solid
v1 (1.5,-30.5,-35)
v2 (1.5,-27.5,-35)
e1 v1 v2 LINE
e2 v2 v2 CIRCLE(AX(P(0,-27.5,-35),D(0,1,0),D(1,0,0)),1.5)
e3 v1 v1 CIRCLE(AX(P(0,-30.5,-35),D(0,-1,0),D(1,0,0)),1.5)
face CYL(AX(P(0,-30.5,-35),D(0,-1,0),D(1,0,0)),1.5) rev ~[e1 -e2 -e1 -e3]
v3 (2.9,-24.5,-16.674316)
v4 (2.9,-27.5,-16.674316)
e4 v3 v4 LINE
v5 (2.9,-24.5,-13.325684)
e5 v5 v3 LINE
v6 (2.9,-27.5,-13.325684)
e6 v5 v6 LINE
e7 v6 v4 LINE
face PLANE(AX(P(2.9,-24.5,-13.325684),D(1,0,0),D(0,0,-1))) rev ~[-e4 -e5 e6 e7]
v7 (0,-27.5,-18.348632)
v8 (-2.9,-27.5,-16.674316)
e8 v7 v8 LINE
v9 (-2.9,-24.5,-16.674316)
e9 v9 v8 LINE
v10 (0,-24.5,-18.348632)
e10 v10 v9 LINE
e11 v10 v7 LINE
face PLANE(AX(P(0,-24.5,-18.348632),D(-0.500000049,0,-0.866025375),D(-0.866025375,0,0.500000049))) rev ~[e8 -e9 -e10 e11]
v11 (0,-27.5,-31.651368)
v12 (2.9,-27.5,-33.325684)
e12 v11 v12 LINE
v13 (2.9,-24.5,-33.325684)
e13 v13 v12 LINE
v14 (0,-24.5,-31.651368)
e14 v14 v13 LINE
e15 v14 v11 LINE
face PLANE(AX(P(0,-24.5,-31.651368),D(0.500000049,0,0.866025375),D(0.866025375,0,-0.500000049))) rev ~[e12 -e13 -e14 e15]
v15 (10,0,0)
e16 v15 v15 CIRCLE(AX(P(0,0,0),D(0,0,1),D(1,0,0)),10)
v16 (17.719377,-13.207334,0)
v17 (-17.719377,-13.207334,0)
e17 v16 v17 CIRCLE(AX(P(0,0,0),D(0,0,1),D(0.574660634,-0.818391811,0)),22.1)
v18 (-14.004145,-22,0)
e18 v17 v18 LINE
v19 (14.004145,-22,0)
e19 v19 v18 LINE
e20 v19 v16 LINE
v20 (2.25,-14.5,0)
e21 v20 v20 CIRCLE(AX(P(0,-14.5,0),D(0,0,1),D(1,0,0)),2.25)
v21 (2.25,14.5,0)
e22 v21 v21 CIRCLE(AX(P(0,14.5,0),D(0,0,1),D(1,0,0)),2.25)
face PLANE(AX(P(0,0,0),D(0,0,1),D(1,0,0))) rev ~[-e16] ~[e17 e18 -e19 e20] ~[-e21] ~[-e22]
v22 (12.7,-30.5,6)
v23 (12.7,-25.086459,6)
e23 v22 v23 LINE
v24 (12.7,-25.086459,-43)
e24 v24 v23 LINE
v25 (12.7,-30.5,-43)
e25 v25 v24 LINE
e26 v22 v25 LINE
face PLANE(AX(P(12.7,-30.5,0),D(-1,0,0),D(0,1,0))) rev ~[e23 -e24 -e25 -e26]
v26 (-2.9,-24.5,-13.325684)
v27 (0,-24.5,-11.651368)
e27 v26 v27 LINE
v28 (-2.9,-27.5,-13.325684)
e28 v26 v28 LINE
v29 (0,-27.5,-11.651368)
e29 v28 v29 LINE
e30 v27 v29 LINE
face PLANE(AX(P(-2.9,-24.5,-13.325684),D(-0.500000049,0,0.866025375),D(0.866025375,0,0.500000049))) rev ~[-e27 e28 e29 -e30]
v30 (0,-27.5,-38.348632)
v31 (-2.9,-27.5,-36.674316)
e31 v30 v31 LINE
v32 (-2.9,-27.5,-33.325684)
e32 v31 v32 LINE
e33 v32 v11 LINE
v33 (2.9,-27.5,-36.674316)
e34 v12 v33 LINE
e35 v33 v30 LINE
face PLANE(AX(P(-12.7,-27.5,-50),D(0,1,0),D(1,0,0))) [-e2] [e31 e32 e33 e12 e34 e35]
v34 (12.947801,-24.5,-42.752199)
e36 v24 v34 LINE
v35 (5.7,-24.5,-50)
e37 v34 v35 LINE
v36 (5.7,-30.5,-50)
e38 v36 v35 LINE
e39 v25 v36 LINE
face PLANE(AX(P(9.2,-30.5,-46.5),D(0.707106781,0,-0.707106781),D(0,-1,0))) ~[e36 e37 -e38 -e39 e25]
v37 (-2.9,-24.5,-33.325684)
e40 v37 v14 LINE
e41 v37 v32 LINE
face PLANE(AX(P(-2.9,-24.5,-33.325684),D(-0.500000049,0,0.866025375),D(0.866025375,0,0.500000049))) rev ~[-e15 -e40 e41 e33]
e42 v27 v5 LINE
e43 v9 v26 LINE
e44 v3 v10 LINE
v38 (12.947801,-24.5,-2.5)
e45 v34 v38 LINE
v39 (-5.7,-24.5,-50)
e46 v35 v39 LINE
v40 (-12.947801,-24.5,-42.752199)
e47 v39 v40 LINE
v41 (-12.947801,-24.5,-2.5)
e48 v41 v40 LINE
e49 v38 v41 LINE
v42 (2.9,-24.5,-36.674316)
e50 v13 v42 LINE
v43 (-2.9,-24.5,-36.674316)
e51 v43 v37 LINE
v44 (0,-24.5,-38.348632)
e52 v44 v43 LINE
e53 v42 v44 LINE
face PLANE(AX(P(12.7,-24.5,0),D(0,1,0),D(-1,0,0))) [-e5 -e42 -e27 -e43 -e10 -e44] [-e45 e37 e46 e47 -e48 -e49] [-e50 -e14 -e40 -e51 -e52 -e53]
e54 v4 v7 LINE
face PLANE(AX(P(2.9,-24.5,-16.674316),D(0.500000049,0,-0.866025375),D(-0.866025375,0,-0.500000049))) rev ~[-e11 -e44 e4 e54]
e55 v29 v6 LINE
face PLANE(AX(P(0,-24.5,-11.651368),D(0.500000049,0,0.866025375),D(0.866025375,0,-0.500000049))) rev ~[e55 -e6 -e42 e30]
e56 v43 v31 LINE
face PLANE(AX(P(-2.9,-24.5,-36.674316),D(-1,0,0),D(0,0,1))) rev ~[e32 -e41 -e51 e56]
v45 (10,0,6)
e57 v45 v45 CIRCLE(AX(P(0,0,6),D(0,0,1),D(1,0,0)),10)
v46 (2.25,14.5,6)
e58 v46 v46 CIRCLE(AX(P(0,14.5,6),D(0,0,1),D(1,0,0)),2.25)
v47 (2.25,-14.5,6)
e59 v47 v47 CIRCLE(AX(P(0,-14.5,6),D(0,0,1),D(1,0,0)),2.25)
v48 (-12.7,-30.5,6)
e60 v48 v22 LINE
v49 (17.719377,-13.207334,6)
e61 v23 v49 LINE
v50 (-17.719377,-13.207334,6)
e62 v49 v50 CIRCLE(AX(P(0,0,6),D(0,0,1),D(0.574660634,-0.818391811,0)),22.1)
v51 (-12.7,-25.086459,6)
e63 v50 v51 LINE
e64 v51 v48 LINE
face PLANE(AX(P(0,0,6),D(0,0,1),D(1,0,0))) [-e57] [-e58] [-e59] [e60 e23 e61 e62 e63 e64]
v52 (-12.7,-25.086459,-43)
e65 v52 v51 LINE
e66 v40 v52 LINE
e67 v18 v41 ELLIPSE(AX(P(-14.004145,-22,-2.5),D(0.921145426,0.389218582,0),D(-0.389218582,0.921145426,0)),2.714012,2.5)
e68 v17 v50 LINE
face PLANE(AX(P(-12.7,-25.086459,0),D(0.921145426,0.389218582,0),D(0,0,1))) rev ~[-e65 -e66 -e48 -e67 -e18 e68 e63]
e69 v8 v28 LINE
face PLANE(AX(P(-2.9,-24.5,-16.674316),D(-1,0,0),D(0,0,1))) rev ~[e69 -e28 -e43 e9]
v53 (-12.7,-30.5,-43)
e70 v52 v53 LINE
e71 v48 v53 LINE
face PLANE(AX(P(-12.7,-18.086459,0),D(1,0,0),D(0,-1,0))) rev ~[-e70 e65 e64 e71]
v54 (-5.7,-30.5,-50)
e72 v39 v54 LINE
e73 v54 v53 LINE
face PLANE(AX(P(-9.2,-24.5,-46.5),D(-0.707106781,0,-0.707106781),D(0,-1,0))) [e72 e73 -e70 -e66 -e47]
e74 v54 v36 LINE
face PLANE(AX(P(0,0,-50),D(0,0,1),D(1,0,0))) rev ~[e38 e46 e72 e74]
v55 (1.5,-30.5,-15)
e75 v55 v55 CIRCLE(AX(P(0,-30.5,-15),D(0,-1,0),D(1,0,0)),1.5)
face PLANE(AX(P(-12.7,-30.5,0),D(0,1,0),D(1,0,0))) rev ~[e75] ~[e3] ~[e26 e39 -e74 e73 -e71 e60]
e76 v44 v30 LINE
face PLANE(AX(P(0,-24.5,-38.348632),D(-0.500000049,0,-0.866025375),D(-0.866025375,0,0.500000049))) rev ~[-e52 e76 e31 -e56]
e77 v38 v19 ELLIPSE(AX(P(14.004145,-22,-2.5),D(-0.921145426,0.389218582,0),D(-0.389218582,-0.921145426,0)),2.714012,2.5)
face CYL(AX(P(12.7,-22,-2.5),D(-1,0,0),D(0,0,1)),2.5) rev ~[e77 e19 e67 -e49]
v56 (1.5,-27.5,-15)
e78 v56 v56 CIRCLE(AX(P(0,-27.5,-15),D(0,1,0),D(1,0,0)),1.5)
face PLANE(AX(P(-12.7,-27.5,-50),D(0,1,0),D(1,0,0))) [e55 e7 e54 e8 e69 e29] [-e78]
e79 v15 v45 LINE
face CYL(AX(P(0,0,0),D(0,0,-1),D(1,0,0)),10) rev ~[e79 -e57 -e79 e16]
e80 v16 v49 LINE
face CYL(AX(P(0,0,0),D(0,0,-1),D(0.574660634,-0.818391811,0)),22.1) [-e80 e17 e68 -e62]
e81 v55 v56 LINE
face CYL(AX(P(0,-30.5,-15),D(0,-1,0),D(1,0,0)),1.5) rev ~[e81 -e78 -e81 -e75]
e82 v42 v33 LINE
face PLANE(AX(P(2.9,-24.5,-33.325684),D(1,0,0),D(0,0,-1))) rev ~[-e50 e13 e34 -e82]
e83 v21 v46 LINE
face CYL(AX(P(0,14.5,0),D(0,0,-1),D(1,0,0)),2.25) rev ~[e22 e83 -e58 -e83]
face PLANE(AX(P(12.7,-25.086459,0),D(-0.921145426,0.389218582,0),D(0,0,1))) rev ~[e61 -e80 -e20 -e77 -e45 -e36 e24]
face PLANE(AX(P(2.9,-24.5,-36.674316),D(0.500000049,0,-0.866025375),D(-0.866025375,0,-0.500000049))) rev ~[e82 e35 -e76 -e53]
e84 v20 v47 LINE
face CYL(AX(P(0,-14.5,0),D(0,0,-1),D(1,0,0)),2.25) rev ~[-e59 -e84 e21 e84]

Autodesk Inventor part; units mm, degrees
ref_plane "YZ Plane" through (0, 0, 0) normal (1, 0, 0) x (0, 1, 0)
ref_plane "XZ Plane" through (0, 0, 0) normal (0, 1, 0) x (-1, 0, 0)
ref_plane "XY Plane" through (0, 0, 0) normal (0, 0, 1) x (1, 0, 0)
sketch "Sketch1" plane through (0, 0, 0) normal (0, 0, 1) x (1, 0, 0)
  circle A0 centre (0, 0) radius 22.1
  circle A1 centre (0, 14.5) radius 2.25
  circle A2 centre (0, -14.5) radius 2.25
  line L0 (0, 14.5) -> (0, -14.5)
  circle A3 centre (0, 0) radius 10
  line L1 (-12.7, -18.086459) -> (-12.7, -30.5)
  line L2 (-12.7, -30.5) -> (12.7, -30.5)
  line L3 (12.7, -30.5) -> (12.7, -18.086459)
  line L4 (-12.7, -24.5) -> (12.7, -24.5)
  point P0 (0, -30.5)
  dimension "d0" = 44.2
  dimension "d1" = 29
  dimension "d2" = 4.5
  dimension "d3" = 20
  dimension "d4" = 30.5
  dimension "d5" = 6
  dimension "d23" = 25.4
sketch "Sketch1 outline for Extrusion1" plane through (0, 0, 0) normal (0, 0, 1) x (1, 0, 0)
  arc A0 (12.7, -18.086459) -> (-12.7, -18.086459) centre (0, 0) ccw
  line L0 (12.7, -30.5) -> (12.7, -18.086459)
  line L1 (-12.7, -18.086459) -> (-12.7, -30.5)
  line L2 (-12.7, -30.5) -> (12.7, -30.5)
  circle A1 centre (0, -14.5) radius 2.25
  circle A2 centre (0, 14.5) radius 2.25
  circle A3 centre (0, 0) radius 10
extrude "Extrusion1" add sketch "Sketch1 outline for Extrusion1" along normal blind 6
sketch "Sketch1 outline for Extrusion2" plane through (0, 0, 0) normal (0, 0, 1) x (1, 0, 0)
  line L0 (-12.7, -30.5) -> (12.7, -30.5)
  line L1 (-12.7, -24.5) -> (-12.7, -30.5)
  line L2 (12.7, -24.5) -> (-12.7, -24.5)
  line L3 (12.7, -30.5) -> (12.7, -24.5)
extrude "Extrusion2" add sketch "Sketch1 outline for Extrusion2" against normal blind 50
fillet "Fillet1" radius 2.5 1 edges at (0, -24.5, 0)
sketch "Sketch2" plane through (-12.7, -30.5, 6) normal (0, -1, 0) x (1, 0, 0)
  circle A0 centre (12.7, -41) radius 1.5
  circle A1 centre (12.7, -21) radius 1.5
  line L0 (25.4, -56) -> (0, -56) projected
  point P0 (12.7, -6)
  point P1 (12.7, -56)
  dimension "d11" = 20
  dimension "d12" = 15
  dimension "d13" = 3
sketch "Sketch2 outline for Extrusion3" plane through (-12.7, -30.5, 6) normal (0, -1, 0) x (1, 0, 0)
  circle A0 centre (12.7, -21) radius 1.5
  circle A1 centre (12.7, -41) radius 1.5
extrude "Extrusion3" cut sketch "Sketch2 outline for Extrusion3" against normal blind 50
sketch "Sketch3" plane through (-12.7, -24.5, -50) normal (0, 1, 0) x (1, 0, 0)
  circle A0 centre (12.7, -35) radius 1.5
  circle A1 centre (12.7, -15) radius 1.5
  line L0 (25.4, -47.5) -> (0, -47.5)
  line L1 (25.4, -47.5) -> (25.4, 0)
  line L2 (0, 0) -> (25.4, 0)
  line L3 (0, -47.5) -> (0, 0)
  line L4 (12.7, -18.348632) -> (9.8, -16.674316)
  line L5 (9.8, -16.674316) -> (9.8, -13.325684)
  line L6 (9.8, -13.325684) -> (12.7, -11.651368)
  line L7 (12.7, -11.651368) -> (15.6, -13.325684)
  line L8 (15.6, -13.325684) -> (15.6, -16.674316)
  line L9 (15.6, -16.674316) -> (12.7, -18.348632)
  line L10 (12.7, -31.651368) -> (15.6, -33.325684)
  line L11 (15.6, -33.325684) -> (15.6, -36.674316)
  line L12 (15.6, -36.674316) -> (12.7, -38.348632)
  line L13 (12.7, -38.348632) -> (9.8, -36.674316)
  line L14 (9.8, -36.674316) -> (9.8, -33.325684)
  line L15 (9.8, -33.325684) -> (12.7, -31.651368)
  point P0 (12.7, -50)
  point P1 (12.7, -15)
  point P2 (12.7, -35)
  point P3 (15.6, -15)
  dimension "d16" = 5.8
  dimension "d17" = 5.8
sketch "Sketch3 outline for Extrusion4" plane through (-12.7, -24.5, -50) normal (0, 1, 0) x (1, 0, 0)
  line L0 (12.7, -18.348632) -> (15.6, -16.674316)
  line L1 (9.8, -16.674316) -> (12.7, -18.348632)
  line L2 (15.6, -16.674316) -> (15.6, -13.325684)
  line L3 (9.8, -13.325684) -> (9.8, -16.674316)
  line L4 (15.6, -13.325684) -> (12.7, -11.651368)
  line L5 (12.7, -11.651368) -> (9.8, -13.325684)
  circle A0 centre (12.7, -15) radius 1.5
  line L6 (12.7, -31.651368) -> (9.8, -33.325684)
  line L7 (15.6, -33.325684) -> (12.7, -31.651368)
  line L8 (9.8, -33.325684) -> (9.8, -36.674316)
  line L9 (15.6, -36.674316) -> (15.6, -33.325684)
  line L10 (9.8, -36.674316) -> (12.7, -38.348632)
  line L11 (12.7, -38.348632) -> (15.6, -36.674316)
  circle A1 centre (12.7, -35) radius 1.5
extrude "Extrusion4" cut sketch "Sketch3 outline for Extrusion4" against normal blind 3
chamfer "Chamfer1" distance 7 angle 45 2 edges at (12.7, -27.5, -50) (-12.7, -27.5, -50)
chamfer "Chamfer2" distance 7 angle 45 2 edges at (12.7, -18.0865, 3) (-12.7, -18.0865, 3)
properties part number "MOTOR_NUEVO_DC" material "Steel, Mild, Welded"
